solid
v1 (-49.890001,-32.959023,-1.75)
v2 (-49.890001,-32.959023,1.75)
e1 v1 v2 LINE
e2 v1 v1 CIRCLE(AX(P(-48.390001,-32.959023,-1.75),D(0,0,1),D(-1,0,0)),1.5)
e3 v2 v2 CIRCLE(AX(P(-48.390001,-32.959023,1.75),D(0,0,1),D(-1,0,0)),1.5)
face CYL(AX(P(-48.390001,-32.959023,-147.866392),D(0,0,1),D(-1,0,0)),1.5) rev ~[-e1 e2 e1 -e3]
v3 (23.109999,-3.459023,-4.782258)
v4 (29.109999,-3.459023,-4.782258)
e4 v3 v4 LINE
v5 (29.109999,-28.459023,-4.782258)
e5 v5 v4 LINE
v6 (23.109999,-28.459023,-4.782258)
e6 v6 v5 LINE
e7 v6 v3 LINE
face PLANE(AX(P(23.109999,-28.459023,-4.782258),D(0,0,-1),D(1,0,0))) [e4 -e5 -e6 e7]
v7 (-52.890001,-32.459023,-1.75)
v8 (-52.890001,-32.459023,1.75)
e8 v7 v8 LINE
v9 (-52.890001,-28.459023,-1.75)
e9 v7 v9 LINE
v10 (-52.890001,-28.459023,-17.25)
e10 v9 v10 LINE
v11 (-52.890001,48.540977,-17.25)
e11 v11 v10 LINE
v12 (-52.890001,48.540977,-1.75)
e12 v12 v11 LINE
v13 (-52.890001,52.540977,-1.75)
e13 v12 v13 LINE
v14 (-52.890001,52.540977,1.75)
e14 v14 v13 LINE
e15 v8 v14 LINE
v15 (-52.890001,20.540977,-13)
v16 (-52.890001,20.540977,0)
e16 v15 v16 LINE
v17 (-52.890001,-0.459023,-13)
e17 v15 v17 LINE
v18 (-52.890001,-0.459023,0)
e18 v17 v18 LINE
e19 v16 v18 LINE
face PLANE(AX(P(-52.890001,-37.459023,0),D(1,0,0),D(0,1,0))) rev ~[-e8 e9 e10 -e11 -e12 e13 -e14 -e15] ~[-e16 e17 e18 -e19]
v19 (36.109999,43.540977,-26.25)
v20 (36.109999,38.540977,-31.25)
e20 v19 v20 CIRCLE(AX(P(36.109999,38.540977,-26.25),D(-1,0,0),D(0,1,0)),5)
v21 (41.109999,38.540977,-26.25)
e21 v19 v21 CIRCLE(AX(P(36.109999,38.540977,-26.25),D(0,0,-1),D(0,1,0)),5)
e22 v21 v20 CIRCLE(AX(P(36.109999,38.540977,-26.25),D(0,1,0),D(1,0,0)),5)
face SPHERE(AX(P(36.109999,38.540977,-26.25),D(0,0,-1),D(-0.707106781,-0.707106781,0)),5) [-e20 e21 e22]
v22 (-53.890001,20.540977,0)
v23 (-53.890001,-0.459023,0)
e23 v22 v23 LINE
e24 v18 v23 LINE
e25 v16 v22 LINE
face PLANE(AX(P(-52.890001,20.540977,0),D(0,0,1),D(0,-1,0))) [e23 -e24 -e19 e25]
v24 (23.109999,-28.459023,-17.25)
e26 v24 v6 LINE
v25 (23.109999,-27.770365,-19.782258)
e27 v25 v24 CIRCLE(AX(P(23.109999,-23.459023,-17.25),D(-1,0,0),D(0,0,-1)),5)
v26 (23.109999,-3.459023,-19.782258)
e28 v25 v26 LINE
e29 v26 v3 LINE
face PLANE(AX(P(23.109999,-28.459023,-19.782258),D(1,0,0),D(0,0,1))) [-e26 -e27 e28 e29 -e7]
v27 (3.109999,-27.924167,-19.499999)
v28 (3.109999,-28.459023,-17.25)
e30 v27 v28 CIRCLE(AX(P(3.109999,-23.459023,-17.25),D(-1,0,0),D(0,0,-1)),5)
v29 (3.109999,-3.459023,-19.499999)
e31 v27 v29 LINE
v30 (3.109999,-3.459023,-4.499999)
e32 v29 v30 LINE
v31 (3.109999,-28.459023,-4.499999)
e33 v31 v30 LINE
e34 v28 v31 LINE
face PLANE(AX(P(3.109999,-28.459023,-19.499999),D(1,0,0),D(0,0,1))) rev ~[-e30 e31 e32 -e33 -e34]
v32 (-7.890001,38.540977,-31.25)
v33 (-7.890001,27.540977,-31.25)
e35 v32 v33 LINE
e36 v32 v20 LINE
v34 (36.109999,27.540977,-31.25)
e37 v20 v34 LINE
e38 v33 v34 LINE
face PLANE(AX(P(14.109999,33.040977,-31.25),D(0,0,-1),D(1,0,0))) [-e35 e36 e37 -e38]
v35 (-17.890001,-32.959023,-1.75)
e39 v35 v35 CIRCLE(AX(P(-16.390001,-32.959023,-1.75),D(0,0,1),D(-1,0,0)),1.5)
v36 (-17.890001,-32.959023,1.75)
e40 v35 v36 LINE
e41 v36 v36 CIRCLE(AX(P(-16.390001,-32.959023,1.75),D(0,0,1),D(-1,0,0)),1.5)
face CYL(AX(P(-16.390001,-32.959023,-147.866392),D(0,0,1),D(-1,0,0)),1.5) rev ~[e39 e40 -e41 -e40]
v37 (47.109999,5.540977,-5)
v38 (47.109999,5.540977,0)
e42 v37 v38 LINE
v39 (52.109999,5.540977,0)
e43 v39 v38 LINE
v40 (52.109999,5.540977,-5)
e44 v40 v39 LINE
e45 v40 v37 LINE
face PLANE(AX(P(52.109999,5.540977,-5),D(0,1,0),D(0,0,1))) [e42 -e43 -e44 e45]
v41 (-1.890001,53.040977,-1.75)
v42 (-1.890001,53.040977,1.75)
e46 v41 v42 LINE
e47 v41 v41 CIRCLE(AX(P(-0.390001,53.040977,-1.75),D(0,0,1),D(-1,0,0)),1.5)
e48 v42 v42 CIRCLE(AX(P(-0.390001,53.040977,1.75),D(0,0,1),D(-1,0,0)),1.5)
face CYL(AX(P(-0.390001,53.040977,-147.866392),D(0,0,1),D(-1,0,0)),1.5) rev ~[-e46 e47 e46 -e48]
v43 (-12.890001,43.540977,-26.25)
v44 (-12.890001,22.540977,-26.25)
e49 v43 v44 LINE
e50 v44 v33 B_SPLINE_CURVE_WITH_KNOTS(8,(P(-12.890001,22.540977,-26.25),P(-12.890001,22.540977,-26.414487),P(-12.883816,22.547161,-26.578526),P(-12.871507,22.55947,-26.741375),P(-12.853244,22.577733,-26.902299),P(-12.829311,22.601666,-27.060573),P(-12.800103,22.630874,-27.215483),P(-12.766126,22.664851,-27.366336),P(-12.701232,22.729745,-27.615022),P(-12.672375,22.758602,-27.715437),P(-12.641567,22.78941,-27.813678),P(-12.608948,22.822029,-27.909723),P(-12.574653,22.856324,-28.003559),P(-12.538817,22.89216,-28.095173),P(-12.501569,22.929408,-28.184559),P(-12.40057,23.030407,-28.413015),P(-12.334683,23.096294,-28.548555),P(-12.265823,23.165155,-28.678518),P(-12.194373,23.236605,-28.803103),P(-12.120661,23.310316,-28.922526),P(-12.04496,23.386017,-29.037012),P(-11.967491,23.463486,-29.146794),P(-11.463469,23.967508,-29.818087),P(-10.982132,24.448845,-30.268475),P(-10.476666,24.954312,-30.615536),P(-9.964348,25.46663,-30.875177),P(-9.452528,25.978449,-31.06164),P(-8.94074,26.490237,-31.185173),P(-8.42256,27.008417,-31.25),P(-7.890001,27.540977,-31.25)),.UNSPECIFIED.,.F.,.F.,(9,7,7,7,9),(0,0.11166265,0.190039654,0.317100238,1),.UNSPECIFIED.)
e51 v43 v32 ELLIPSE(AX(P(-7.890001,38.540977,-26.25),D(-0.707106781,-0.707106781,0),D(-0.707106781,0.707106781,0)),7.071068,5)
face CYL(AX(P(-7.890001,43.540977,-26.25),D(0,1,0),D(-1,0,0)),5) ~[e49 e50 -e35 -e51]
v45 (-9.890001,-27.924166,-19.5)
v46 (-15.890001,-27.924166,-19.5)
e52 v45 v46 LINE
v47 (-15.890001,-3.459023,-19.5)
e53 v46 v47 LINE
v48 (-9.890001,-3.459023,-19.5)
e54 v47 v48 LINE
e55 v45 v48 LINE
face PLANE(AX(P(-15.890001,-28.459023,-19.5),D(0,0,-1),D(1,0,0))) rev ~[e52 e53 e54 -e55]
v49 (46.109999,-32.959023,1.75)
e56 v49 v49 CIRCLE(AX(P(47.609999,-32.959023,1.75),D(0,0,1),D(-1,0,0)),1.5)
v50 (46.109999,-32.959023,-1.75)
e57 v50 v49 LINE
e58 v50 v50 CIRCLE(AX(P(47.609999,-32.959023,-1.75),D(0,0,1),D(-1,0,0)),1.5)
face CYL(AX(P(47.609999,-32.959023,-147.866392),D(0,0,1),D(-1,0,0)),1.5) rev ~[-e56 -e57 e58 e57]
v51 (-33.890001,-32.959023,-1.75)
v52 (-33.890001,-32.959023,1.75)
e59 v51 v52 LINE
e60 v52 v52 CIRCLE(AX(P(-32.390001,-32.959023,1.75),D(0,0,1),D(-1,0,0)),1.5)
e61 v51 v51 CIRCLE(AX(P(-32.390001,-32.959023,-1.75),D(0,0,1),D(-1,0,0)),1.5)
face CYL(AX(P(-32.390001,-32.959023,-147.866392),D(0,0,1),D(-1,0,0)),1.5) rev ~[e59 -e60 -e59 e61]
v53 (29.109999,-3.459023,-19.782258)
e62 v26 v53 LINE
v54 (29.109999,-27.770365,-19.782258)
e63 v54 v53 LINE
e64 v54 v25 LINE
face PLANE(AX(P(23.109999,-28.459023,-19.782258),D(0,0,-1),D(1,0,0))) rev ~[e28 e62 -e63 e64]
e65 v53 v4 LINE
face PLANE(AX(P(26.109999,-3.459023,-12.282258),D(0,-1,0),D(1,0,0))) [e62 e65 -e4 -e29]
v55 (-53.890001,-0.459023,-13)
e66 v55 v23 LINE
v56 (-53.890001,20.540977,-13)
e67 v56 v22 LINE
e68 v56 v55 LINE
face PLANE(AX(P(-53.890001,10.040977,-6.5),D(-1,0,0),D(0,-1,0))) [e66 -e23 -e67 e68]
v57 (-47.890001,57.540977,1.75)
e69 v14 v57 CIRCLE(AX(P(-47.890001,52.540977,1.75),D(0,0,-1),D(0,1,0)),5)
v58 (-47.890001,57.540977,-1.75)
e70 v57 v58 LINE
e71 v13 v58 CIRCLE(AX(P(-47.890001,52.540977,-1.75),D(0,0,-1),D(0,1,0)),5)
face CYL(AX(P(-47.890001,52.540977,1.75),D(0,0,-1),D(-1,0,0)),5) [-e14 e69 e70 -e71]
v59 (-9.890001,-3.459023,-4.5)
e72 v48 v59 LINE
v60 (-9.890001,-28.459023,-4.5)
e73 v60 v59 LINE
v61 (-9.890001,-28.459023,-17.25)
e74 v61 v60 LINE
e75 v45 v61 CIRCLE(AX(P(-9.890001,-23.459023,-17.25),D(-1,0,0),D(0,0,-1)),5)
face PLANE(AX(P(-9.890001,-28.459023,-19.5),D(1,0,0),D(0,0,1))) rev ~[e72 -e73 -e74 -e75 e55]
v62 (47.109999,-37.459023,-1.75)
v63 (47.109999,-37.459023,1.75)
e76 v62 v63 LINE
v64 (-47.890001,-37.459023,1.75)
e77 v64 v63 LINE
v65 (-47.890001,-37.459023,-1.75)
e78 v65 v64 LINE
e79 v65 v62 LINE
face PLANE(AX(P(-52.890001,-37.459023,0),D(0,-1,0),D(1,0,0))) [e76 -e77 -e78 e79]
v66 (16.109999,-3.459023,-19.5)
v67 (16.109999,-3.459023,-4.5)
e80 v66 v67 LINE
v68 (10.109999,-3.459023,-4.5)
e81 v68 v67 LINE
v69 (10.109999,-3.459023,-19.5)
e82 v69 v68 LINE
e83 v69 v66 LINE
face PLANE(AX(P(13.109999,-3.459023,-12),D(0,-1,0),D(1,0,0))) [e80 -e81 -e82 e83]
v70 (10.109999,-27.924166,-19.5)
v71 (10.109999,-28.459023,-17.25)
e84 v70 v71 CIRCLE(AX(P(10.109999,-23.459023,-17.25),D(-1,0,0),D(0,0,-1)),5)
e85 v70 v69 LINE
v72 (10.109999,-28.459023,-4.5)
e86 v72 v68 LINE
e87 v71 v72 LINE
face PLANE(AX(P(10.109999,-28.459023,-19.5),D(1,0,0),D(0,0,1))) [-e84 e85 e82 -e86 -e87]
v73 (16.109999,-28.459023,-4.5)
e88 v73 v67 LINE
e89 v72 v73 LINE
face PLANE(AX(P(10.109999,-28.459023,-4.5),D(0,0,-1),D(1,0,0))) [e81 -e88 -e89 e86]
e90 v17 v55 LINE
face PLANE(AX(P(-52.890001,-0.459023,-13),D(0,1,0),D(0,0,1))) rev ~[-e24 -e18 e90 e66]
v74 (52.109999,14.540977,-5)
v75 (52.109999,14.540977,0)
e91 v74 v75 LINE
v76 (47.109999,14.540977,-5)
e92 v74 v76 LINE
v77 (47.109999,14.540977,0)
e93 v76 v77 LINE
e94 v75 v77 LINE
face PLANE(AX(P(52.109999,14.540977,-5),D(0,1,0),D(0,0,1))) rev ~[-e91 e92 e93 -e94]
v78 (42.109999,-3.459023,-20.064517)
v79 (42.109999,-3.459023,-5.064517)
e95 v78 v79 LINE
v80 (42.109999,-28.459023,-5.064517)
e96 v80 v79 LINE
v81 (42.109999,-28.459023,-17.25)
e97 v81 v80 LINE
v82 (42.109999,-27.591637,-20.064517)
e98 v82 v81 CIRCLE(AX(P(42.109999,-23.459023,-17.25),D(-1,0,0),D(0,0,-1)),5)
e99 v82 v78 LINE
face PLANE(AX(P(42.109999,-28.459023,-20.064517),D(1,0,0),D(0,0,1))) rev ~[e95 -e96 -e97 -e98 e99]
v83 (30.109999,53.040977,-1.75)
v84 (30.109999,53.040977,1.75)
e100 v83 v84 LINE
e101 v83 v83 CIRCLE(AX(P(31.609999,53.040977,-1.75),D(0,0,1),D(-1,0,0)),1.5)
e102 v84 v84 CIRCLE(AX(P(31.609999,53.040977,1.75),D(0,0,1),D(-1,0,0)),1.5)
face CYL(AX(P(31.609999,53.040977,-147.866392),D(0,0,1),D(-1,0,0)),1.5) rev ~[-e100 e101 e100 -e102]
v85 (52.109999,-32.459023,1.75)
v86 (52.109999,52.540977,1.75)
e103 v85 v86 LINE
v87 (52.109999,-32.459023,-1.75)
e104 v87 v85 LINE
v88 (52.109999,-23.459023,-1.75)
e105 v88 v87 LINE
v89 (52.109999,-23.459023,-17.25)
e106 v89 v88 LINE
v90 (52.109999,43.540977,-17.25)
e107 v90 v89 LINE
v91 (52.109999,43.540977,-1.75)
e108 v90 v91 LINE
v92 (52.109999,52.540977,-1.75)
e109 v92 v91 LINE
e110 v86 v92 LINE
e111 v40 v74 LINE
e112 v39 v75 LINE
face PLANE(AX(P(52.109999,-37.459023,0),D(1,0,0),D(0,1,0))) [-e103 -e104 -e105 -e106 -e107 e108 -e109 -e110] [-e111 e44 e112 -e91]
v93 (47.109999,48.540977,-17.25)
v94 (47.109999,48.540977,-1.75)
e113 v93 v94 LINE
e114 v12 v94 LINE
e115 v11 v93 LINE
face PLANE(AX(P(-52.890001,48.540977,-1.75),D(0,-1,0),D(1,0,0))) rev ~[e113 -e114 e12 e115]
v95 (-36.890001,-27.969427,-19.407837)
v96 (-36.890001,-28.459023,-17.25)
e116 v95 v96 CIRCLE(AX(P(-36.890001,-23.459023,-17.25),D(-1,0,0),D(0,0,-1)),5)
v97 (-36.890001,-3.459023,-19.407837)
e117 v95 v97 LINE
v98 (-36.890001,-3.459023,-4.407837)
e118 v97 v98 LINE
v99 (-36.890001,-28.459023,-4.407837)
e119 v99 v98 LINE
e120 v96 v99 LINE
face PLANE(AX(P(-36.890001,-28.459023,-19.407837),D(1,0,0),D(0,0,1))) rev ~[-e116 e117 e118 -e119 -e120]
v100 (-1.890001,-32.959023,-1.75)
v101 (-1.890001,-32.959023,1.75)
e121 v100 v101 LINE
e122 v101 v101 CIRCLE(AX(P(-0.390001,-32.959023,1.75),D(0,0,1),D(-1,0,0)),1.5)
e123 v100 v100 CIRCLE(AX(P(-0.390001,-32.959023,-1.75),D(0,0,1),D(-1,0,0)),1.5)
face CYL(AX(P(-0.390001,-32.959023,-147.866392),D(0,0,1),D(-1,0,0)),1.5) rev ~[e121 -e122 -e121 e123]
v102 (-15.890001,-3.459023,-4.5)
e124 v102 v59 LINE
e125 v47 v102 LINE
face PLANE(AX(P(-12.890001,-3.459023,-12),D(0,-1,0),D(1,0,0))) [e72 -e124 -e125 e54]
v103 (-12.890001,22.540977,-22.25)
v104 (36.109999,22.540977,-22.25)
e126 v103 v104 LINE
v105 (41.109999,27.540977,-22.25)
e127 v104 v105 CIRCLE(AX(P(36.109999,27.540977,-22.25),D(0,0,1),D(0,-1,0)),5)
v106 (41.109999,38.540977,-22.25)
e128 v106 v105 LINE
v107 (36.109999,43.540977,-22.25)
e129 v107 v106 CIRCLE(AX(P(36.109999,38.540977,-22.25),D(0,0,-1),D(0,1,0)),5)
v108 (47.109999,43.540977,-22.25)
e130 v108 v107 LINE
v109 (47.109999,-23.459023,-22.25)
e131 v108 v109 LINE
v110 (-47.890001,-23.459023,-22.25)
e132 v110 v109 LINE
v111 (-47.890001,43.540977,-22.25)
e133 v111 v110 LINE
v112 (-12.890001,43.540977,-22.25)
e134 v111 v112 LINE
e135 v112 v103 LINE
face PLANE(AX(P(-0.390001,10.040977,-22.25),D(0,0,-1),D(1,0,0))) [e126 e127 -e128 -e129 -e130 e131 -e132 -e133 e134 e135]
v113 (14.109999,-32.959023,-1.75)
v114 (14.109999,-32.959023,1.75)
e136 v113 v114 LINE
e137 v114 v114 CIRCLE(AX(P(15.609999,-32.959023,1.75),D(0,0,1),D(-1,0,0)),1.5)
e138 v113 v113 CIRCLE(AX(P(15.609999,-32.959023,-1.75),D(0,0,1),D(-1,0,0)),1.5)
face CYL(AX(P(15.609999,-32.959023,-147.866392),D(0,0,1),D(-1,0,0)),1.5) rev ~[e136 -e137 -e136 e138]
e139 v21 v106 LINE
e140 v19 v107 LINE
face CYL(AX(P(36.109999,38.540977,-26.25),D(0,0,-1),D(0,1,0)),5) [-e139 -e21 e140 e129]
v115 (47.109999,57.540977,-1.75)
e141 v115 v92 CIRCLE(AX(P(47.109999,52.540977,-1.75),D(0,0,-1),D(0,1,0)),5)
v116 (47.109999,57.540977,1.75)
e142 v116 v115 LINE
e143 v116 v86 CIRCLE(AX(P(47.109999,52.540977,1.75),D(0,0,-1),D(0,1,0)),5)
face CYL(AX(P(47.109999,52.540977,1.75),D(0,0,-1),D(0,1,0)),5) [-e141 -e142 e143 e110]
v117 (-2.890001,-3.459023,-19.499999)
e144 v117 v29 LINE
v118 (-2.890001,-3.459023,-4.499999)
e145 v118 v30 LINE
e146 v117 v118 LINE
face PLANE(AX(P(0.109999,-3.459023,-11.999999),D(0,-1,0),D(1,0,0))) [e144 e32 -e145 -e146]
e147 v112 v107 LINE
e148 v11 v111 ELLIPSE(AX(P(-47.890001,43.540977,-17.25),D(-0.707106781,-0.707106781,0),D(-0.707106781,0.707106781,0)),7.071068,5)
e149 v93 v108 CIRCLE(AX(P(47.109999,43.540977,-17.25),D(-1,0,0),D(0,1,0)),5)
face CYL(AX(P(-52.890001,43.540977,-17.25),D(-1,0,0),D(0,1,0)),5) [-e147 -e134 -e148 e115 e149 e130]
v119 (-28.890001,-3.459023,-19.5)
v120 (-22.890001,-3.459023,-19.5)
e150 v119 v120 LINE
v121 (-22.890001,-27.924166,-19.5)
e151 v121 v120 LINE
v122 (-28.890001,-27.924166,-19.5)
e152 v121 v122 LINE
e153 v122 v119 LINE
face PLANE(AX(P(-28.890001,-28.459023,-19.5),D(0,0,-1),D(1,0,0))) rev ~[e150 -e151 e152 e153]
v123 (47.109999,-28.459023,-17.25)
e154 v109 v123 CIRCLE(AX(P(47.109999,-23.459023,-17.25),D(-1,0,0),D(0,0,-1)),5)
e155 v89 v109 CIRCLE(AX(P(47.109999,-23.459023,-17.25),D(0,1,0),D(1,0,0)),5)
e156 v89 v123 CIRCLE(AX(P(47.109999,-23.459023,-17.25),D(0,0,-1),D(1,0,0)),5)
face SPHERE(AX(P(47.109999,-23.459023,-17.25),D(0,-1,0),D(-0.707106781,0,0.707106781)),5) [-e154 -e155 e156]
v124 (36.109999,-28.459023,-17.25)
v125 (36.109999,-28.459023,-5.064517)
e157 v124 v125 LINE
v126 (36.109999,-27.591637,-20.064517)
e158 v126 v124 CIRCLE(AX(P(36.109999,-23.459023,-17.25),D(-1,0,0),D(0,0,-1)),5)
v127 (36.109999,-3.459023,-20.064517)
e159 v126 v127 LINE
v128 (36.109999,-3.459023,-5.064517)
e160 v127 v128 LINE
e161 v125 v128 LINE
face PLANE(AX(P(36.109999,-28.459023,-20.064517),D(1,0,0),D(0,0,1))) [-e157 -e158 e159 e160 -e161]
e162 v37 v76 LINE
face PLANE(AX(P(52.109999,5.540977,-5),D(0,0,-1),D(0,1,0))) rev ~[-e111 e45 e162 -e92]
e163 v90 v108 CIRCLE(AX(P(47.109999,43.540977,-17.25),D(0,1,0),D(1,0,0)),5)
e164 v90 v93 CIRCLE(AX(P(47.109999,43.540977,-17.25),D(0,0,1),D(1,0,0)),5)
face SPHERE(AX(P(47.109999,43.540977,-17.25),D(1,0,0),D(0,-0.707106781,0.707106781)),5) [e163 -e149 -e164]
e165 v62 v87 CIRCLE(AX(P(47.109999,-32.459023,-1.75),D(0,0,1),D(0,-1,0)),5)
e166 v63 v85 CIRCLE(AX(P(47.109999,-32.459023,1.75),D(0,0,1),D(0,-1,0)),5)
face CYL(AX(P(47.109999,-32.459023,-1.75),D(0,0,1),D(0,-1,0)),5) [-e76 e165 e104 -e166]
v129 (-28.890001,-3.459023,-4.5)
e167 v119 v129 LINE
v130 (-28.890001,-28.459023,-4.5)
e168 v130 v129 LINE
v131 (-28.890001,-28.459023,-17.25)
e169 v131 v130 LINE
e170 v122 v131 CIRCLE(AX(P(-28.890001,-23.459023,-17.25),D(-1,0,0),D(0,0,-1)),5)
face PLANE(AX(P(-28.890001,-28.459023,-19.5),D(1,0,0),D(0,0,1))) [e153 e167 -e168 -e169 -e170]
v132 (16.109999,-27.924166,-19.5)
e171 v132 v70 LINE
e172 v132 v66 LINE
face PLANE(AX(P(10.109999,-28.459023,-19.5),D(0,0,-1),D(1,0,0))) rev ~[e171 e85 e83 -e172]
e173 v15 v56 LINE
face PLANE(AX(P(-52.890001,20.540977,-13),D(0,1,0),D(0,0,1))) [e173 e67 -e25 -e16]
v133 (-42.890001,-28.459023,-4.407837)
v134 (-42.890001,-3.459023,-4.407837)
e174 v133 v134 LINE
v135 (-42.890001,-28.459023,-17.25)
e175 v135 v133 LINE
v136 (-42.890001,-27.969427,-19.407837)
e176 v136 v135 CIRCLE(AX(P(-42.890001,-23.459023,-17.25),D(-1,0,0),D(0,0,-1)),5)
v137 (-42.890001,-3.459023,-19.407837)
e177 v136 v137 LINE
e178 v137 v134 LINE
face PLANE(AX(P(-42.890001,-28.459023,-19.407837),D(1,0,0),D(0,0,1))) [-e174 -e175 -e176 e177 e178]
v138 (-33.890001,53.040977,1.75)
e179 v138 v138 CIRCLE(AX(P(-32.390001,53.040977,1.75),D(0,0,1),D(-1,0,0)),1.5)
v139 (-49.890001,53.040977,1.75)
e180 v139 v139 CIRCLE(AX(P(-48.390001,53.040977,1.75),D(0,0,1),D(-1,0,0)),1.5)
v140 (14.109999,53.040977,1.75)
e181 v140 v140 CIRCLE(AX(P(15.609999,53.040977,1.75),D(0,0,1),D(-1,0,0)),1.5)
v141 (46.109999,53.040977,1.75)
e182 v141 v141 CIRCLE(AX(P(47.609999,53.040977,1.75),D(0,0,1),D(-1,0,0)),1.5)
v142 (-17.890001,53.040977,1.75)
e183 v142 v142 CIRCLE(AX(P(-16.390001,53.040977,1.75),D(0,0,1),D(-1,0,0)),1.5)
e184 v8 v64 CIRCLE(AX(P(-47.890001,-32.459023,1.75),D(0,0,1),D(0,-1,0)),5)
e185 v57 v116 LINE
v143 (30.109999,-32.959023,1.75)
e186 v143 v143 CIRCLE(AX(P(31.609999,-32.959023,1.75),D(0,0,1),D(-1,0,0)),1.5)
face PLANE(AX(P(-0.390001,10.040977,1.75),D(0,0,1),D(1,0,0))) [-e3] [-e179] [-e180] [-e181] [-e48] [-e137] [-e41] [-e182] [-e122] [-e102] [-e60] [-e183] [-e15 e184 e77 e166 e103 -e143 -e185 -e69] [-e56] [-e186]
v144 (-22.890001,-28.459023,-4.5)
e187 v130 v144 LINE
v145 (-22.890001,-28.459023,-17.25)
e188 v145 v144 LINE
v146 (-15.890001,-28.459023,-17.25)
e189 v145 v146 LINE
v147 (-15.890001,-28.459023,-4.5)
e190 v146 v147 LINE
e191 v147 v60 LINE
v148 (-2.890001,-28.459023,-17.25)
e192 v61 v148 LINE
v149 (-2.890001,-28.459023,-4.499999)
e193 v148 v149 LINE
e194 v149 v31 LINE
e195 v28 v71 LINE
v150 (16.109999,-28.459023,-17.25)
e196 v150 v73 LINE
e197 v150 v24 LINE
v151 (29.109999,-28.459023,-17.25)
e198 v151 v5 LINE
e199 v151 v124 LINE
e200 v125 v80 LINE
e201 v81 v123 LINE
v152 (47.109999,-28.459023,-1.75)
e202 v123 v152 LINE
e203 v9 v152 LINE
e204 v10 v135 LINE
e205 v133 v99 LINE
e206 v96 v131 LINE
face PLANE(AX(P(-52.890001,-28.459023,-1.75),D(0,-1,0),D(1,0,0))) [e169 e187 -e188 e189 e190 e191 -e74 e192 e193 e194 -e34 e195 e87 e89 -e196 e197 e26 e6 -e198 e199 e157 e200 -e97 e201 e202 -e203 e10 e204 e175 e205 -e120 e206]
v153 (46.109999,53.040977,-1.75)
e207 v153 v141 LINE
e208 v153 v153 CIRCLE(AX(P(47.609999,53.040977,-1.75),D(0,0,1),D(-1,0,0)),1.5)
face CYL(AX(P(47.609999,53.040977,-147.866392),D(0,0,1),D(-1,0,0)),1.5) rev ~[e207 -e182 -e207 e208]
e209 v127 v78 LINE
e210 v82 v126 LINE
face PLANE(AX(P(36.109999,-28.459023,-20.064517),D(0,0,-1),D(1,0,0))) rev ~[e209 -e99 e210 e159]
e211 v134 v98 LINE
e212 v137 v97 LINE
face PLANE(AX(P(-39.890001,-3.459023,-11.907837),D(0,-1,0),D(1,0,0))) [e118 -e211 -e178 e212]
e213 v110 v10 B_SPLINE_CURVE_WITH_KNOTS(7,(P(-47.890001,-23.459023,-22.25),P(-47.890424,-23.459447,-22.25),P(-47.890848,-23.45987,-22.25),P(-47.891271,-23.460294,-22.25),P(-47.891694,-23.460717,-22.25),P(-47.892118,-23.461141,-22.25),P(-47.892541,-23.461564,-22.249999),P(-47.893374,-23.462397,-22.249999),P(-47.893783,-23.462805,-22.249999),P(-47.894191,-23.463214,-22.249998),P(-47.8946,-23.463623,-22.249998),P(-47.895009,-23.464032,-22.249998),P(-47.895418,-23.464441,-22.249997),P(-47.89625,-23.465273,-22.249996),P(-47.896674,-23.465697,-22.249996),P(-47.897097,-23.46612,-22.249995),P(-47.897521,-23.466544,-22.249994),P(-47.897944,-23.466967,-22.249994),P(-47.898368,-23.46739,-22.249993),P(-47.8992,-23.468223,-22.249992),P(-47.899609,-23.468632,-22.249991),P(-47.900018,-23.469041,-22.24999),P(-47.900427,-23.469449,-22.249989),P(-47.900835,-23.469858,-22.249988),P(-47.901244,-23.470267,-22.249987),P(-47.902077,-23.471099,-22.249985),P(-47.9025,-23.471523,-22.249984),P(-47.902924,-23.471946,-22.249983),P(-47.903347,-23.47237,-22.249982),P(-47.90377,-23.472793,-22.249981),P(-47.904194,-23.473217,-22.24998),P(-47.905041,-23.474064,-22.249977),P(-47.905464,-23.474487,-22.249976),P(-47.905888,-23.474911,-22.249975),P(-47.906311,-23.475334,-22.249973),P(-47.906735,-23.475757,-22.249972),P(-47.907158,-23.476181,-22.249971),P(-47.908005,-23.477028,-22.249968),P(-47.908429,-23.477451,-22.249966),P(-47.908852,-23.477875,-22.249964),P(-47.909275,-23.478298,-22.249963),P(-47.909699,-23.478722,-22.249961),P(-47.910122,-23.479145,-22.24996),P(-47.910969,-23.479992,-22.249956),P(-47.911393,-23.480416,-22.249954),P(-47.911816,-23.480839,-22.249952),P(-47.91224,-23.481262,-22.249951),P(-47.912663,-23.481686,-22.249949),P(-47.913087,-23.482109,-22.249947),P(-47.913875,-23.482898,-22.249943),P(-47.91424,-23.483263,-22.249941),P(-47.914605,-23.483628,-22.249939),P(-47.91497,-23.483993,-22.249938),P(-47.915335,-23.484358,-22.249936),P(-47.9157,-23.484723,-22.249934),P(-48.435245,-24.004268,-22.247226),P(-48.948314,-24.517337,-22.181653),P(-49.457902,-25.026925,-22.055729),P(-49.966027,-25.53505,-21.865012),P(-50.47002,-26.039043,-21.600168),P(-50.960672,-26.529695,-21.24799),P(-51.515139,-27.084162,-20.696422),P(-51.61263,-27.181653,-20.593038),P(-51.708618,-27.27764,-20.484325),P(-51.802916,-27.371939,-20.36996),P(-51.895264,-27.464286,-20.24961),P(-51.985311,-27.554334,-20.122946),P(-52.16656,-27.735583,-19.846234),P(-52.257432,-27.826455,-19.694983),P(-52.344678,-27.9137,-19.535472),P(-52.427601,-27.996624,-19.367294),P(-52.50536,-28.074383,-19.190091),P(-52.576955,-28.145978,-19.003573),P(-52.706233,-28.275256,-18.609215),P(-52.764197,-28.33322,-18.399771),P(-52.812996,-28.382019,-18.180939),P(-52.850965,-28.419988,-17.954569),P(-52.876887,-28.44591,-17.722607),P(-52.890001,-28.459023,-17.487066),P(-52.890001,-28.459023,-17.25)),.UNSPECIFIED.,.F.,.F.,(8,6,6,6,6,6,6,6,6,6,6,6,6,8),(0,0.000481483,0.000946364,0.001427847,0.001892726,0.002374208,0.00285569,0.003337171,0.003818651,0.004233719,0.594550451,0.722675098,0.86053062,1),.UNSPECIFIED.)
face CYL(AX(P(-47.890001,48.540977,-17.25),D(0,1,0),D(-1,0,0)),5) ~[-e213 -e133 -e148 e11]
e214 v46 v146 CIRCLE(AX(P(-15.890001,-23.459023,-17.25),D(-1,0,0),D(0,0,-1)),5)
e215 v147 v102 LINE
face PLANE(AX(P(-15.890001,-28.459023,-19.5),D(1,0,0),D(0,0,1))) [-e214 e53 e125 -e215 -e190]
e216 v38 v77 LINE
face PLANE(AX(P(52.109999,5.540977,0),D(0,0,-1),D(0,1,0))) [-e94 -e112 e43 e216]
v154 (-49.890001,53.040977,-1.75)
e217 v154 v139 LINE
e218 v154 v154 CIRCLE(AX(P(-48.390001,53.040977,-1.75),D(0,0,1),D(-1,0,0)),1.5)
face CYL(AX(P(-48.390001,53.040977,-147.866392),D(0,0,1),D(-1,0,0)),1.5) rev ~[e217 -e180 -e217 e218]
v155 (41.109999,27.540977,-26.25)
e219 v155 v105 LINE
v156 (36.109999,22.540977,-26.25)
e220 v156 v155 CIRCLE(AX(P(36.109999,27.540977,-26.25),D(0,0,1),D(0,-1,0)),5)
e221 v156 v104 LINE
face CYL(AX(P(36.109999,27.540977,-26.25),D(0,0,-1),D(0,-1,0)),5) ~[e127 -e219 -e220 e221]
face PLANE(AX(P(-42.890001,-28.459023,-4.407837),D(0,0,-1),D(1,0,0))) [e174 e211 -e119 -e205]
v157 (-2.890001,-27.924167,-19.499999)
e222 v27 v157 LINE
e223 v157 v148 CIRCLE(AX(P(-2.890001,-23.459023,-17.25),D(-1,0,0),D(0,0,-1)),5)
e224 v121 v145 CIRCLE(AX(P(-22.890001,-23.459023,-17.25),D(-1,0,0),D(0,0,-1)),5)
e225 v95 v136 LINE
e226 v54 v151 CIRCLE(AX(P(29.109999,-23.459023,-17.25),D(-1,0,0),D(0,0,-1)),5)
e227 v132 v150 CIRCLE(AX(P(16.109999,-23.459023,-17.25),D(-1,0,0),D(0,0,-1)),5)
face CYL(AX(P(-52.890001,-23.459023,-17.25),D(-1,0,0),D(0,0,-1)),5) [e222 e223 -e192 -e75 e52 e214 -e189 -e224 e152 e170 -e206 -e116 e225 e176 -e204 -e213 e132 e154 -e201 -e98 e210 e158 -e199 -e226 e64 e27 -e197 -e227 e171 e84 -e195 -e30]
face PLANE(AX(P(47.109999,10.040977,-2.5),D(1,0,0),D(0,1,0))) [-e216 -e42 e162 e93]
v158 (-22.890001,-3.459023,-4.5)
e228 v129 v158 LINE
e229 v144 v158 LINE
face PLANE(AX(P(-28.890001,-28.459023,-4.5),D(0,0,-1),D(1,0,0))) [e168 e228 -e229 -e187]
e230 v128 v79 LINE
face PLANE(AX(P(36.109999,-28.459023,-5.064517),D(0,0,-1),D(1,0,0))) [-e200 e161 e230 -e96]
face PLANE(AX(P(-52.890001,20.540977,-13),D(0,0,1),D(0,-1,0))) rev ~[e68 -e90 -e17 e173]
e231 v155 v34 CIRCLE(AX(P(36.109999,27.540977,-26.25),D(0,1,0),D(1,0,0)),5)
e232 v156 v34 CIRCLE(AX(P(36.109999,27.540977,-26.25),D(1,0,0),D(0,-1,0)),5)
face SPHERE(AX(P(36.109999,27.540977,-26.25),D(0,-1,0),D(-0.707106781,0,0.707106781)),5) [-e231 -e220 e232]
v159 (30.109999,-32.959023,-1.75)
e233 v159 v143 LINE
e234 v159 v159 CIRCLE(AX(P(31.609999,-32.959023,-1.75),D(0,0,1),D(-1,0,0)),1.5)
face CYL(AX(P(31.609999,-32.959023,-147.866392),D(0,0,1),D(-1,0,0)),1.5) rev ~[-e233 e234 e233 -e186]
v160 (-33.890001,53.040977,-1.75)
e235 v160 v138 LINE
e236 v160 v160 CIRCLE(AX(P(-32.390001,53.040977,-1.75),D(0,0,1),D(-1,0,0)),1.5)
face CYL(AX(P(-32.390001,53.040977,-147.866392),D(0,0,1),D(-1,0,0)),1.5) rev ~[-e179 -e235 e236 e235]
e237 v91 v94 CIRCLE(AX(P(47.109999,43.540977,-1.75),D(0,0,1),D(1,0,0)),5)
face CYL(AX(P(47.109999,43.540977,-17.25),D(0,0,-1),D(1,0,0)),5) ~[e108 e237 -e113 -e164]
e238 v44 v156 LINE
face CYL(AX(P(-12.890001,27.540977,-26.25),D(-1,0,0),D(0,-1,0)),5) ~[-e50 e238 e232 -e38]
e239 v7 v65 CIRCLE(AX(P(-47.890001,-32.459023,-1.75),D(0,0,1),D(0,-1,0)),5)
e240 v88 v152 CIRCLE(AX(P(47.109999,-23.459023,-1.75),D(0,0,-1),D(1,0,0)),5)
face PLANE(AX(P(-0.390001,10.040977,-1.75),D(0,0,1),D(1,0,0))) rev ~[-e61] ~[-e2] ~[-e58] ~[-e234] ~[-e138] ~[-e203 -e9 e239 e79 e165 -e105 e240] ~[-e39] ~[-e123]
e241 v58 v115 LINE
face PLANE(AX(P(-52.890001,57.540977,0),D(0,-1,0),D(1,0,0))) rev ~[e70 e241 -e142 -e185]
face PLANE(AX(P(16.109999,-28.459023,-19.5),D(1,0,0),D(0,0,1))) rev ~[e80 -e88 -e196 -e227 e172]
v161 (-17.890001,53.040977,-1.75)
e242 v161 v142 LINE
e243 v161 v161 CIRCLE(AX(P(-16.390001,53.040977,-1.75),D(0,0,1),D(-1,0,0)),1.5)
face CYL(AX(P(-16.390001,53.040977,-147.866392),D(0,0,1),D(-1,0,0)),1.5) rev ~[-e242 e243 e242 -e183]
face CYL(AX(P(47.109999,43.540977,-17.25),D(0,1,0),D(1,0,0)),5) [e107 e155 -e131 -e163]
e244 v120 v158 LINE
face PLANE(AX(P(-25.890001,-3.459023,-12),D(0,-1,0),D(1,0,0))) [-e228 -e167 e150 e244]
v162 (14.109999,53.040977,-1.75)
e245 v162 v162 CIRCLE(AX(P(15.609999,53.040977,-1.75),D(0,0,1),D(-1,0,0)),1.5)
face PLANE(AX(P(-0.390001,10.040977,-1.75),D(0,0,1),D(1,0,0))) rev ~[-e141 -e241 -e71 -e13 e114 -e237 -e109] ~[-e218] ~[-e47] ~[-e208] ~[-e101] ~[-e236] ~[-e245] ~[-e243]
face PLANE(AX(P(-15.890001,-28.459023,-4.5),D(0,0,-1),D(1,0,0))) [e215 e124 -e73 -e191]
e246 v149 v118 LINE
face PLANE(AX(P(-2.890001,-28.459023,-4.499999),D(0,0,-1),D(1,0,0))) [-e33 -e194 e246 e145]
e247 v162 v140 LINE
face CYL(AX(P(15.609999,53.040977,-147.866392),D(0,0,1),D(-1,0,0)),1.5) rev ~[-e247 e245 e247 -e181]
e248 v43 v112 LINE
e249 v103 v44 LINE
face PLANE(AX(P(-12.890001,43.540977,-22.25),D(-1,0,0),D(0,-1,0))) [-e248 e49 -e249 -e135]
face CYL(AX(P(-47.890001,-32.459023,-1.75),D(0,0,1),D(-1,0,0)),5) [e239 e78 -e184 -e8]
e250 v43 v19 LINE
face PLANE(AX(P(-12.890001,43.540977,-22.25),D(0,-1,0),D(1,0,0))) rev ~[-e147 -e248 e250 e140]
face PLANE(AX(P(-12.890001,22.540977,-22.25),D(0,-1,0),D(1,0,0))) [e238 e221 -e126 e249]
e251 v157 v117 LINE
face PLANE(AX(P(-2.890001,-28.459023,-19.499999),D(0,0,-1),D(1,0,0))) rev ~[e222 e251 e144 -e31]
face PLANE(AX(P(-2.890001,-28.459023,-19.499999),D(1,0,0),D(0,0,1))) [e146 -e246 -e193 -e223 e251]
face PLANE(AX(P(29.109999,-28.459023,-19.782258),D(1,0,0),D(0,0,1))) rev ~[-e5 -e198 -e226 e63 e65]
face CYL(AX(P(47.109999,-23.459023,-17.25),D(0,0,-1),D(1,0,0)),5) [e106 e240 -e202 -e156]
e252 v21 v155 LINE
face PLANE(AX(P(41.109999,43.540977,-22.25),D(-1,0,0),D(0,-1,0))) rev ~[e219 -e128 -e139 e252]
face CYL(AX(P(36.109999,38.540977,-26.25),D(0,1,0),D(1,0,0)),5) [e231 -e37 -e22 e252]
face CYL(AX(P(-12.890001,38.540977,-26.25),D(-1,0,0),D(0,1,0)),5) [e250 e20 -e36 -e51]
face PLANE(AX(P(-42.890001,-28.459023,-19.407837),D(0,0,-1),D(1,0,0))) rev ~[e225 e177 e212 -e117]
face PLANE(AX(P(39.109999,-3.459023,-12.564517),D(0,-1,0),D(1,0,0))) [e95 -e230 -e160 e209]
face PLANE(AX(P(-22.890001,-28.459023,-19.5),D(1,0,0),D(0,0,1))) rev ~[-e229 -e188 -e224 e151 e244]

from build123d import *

# Parameters (mm, degrees)
F0_W          = 105
F0_H          = 95
F1_DEPTH      = 1.75
F2_W          = 105
F2_H          = 77
F3_DEPTH      = 20.5
F4_W          = 54
F4_H          = 21
F5_DEPTH      = 9
F6_W          = 9
F6_H          = 5
F7_DEPTH      = 5
F8_W          = 21
F8_H          = 13
F9_DEPTH      = 1
F11_D         = 3
F13_D         = 3
F14_W         = 6
F14_H         = 15
F15_DEPTH     = 25
F16_T1_DEPTH  = 67
F16_T3_DEPTH  = 100
F16_T5_DEPTH  = 15.5
F16_T7_DEPTH  = 49
F16_T9_DEPTH  = 11
F16_T11_DEPTH = 21
F16_T13_DEPTH = 4
F16_T15_DEPTH = 77
F16_S19_W     = 5.1
F16_S19_H     = 5.1
F16_T20_DEPTH = 5.1
F16_S25_W     = 5.1
F16_S25_H     = 5.1
F16_T26_DEPTH = 5.1
F16_S31_W     = 5.1
F16_S31_H     = 5.1
F16_T32_DEPTH = 5.1
F16_S37_W     = 5.1
F16_S37_H     = 5.1
F16_T38_DEPTH = 5.1
F16_T45_DEPTH = 89.5
F16_T49_DEPTH = 112.5
F16_T56_DEPTH = 61.5
F16_T60_DEPTH = 33.5
F16_T67_DEPTH = 33.5
F16_T71_DEPTH = 61.5
F16_T78_DEPTH = 89.5
F16_T82_DEPTH = 112.5
F17_R         = 5


# Not quite as in the source:
# - a fillet or chamfer that OpenCascade refuses, or shapes differently, is made with other operations: its cross-section is extruded or revolved along the edge and cut away or added
# - two fillets or chamfers of one size are made in one step


with BuildPart() as f1:
    # F0 (on Top) → F1 (new body, symmetric)
    with BuildSketch(Plane.XY):
        with Locations((-0.3900006413, 10.040976562)):
            Rectangle(F0_W, F0_H)
    extrude(amount=F1_DEPTH, both=True)

    # F2 (on face) → F3 (join)
    with BuildSketch(Plane(origin=(0, 0, -1.75), x_dir=(1, 0, 0), z_dir=(0, 0, -1))):
        with Locations((-0.3900006413, -10.040976562)):
            Rectangle(F2_W, F2_H)
    extrude(amount=F3_DEPTH)

    # F4 (on face) → F5 (join)
    with BuildSketch(Plane(origin=(0, 0, -22.25), x_dir=(1, 0, 0), z_dir=(0, 0, -1))):
        with Locations((14.1099993587, -33.040976562)):
            Rectangle(F4_W, F4_H)
    extrude(amount=F5_DEPTH)

    # F6 (on face) → F7 (cut)
    with BuildSketch(Plane.YZ.offset(52.1099993587)):
        with Locations((10.040976562, -2.5)):
            Rectangle(F6_W, F6_H)
    extrude(amount=-F7_DEPTH, mode=Mode.SUBTRACT)

    # F8 (on face) → F9 (join)
    with BuildSketch(Plane(origin=(-52.8900006413, 0, 0), x_dir=(0, -1, 0), z_dir=(-1, 0, 0))):
        with Locations((-10.040976562, -6.5)):
            Rectangle(F8_W, F8_H)
    extrude(amount=F9_DEPTH)

    # F11 (through all)
    with Locations(Plane(origin=(0, 0, -1.75), x_dir=(1, 0, 0), z_dir=(0, 0, -1))):
        with Locations((47.6099993587, 32.959023438), (31.6099993587, 32.959023438), (15.6099993587, 32.959023438), (-0.3900006413, 32.959023438), (-16.3900006413, 32.959023438), (-32.3900006413, 32.959023438), (-48.3900006413, 32.959023438)):
            Hole(F11_D / 2)

    # F13 (through all)
    with Locations(Plane(origin=(0, 0, -1.75), x_dir=(1, 0, 0), z_dir=(0, 0, -1))):
        with Locations((47.6099993587, -53.040976562), (31.6099993587, -53.040976562), (15.6099993587, -53.040976562), (-0.3900006413, -53.040976562), (-16.3900006413, -53.040976562), (-32.3900006413, -53.040976562), (-48.3900006413, -53.040976562)):
            Hole(F13_D / 2)

    # F14 (on face) → F15 (cut)
    with BuildSketch(Plane.XZ.offset(28.459023438)):
        with Locations((-39.8900006413, -11.9078365183)):
            Rectangle(F14_W, F14_H)
        with Locations((-25.8900006413, -12.0000001043)):
            Rectangle(F14_W, F14_H)
        with Locations((-12.8900006413, -11.9999996386)):
            Rectangle(F14_W, F14_H)
        with Locations((0.1099993587, -11.999999173)):
            Rectangle(F14_W, F14_H)
        with Locations((13.1099993587, -11.9999996386)):
            Rectangle(F14_W, F14_H)
        with Locations((26.1099993587, -12.2822578996)):
            Rectangle(F14_W, F14_H)
        with Locations((39.1099993587, -12.5645168446)):
            Rectangle(F14_W, F14_H)
    extrude(amount=-F15_DEPTH, mode=Mode.SUBTRACT)

    # F16: fillet of radius 5 on 12 edges, made by hand

    # F16_s2 → F16_t1 (cut)
    with BuildSketch(Plane.XZ.offset(-43.540976562)):
        with BuildLine():
            ThreePointArc((52.1099993587, -17.25), (50.6455332646, -20.7855339059), (47.1099993587, -22.25))
            Line((47.1099993587, -22.25), (47.1099993587, -22.35))
            Line((47.1099993587, -22.35), (52.2099993587, -22.35))
            Line((52.2099993587, -22.35), (52.2099993587, -17.25))
            Line((52.2099993587, -17.25), (52.1099993587, -17.25))
        make_face()
    extrude(amount=F16_T1_DEPTH, mode=Mode.SUBTRACT)

    # F16_s4 → F16_t3 (cut)
    with BuildSketch(Plane.YZ.offset(-52.8900006413)):
        with BuildLine():
            ThreePointArc((-23.459023438, -22.25), (-26.9945573439, -20.7855339059), (-28.459023438, -17.25))
            Line((-28.459023438, -17.25), (-28.559023438, -17.25))
            Line((-28.559023438, -17.25), (-28.559023438, -22.35))
            Line((-28.559023438, -22.35), (-23.459023438, -22.35))
            Line((-23.459023438, -22.35), (-23.459023438, -22.25))
        make_face()
        with BuildLine():
            ThreePointArc((48.540976562, -17.25), (47.076510468, -20.7855339059), (43.540976562, -22.25))
            Line((43.540976562, -22.25), (43.540976562, -22.35))
            Line((43.540976562, -22.35), (48.640976562, -22.35))
            Line((48.640976562, -22.35), (48.640976562, -17.25))
            Line((48.640976562, -17.25), (48.540976562, -17.25))
        make_face()
    extrude(amount=F16_T3_DEPTH, mode=Mode.SUBTRACT)

    # F16_s6 → F16_t5 (cut)
    with BuildSketch(Plane.XY.offset(-17.25)):
        with BuildLine():
            ThreePointArc((52.1099993587, -23.459023438), (50.6455332646, -26.9945573439), (47.1099993587, -28.459023438))
            Line((47.1099993587, -28.459023438), (47.1099993587, -28.559023438))
            Line((47.1099993587, -28.559023438), (52.2099993587, -28.559023438))
            Line((52.2099993587, -28.559023438), (52.2099993587, -23.459023438))
            Line((52.2099993587, -23.459023438), (52.1099993587, -23.459023438))
        make_face()
        with BuildLine():
            ThreePointArc((52.1099993587, 43.540976562), (50.6455332646, 47.076510468), (47.1099993587, 48.540976562))
            Line((47.1099993587, 48.540976562), (47.1099993587, 48.640976562))
            Line((47.1099993587, 48.640976562), (52.2099993587, 48.640976562))
            Line((52.2099993587, 48.640976562), (52.2099993587, 43.540976562))
            Line((52.2099993587, 43.540976562), (52.1099993587, 43.540976562))
        make_face()
    extrude(amount=F16_T5_DEPTH, mode=Mode.SUBTRACT)

    # F16_s8 → F16_t7 (cut)
    with BuildSketch(Plane.YZ.offset(-12.8900006413)):
        with BuildLine():
            ThreePointArc((22.540976562, -26.25), (24.0054426561, -29.7855339059), (27.540976562, -31.25))
            Line((27.540976562, -31.25), (27.540976562, -31.35))
            Line((27.540976562, -31.35), (22.440976562, -31.35))
            Line((22.440976562, -31.35), (22.440976562, -26.25))
            Line((22.440976562, -26.25), (22.540976562, -26.25))
        make_face()
        with BuildLine():
            ThreePointArc((43.540976562, -26.25), (42.076510468, -29.7855339059), (38.540976562, -31.25))
            Line((38.540976562, -31.25), (38.540976562, -31.35))
            Line((38.540976562, -31.35), (43.640976562, -31.35))
            Line((43.640976562, -31.35), (43.640976562, -26.25))
            Line((43.640976562, -26.25), (43.540976562, -26.25))
        make_face()
    extrude(amount=F16_T7_DEPTH, mode=Mode.SUBTRACT)

    # F16_s10 → F16_t9 (cut)
    with BuildSketch(Plane.XZ.offset(-38.540976562)):
        with BuildLine():
            ThreePointArc((41.1099993587, -26.25), (39.6455332646, -29.7855339059), (36.1099993587, -31.25))
            Line((36.1099993587, -31.25), (36.1099993587, -31.35))
            Line((36.1099993587, -31.35), (41.2099993587, -31.35))
            Line((41.2099993587, -31.35), (41.2099993587, -26.25))
            Line((41.2099993587, -26.25), (41.1099993587, -26.25))
        make_face()
    extrude(amount=F16_T9_DEPTH, mode=Mode.SUBTRACT)

    # F16_s12 → F16_t11 (cut)
    with BuildSketch(Plane.XZ.offset(-43.540976562)):
        with BuildLine():
            ThreePointArc((-12.8900006413, -26.25), (-11.4255345473, -29.7855339059), (-7.8900006413, -31.25))
            Line((-7.8900006413, -31.25), (-7.8900006413, -31.35))
            Line((-7.8900006413, -31.35), (-12.9900006413, -31.35))
            Line((-12.9900006413, -31.35), (-12.9900006413, -26.25))
            Line((-12.9900006413, -26.25), (-12.8900006413, -26.25))
        make_face()
    extrude(amount=F16_T11_DEPTH, mode=Mode.SUBTRACT)

    # F16_s14 → F16_t13 (cut)
    with BuildSketch(Plane.XY.offset(-26.25)):
        with BuildLine():
            ThreePointArc((36.1099993587, 22.540976562), (39.6455332646, 24.0054426561), (41.1099993587, 27.540976562))
            Line((41.1099993587, 27.540976562), (41.2099993587, 27.540976562))
            Line((41.2099993587, 27.540976562), (41.2099993587, 22.440976562))
            Line((41.2099993587, 22.440976562), (36.1099993587, 22.440976562))
            Line((36.1099993587, 22.440976562), (36.1099993587, 22.540976562))
        make_face()
        with BuildLine():
            ThreePointArc((36.1099993587, 43.540976562), (39.6455332646, 42.076510468), (41.1099993587, 38.540976562))
            Line((41.1099993587, 38.540976562), (41.2099993587, 38.540976562))
            Line((41.2099993587, 38.540976562), (41.2099993587, 43.640976562))
            Line((41.2099993587, 43.640976562), (36.1099993587, 43.640976562))
            Line((36.1099993587, 43.640976562), (36.1099993587, 43.540976562))
        make_face()
    extrude(amount=F16_T13_DEPTH, mode=Mode.SUBTRACT)

    # F16_s16 → F16_t15 (cut)
    with BuildSketch(Plane.XZ.offset(-48.540976562)):
        with BuildLine():
            ThreePointArc((-52.8900006413, -17.25), (-51.4255345473, -20.7855339059), (-47.8900006413, -22.25))
            Line((-47.8900006413, -22.25), (-47.8900006413, -22.35))
            Line((-47.8900006413, -22.35), (-52.9900006413, -22.35))
            Line((-52.9900006413, -22.35), (-52.9900006413, -17.25))
            Line((-52.9900006413, -17.25), (-52.8900006413, -17.25))
        make_face()
    extrude(amount=F16_T15_DEPTH, mode=Mode.SUBTRACT)


with BuildPart() as f16_tool18:
    # F16_s19 → F16_t20 (new body)
    with BuildSketch(Plane.YZ.offset(47.1099993587)):
        with Locations((46.090976562, -19.8)):
            Rectangle(F16_S19_W, F16_S19_H)
    extrude(amount=F16_T20_DEPTH)

    # F16_s21 → F16_t22 (revolve, cut)
    with BuildSketch(Plane(origin=(47.1099993587, 43.540976562, -17.25), x_dir=(0, -0.7071067812, 0.7071067812), z_dir=(0, 0.7071067812, 0.7071067812))):
        with BuildLine():
            ThreePointArc((0, -5), (5, 0), (0, 5))
            Line((0, 5), (0, -5))
        make_face()
    revolve(axis=Axis((47.1099993587, 43.540976562, -17.25), (1, 0, 0)), mode=Mode.SUBTRACT)


with BuildPart() as f1_1:
    add(f1.part)

    # F16_t17: cut F16_tool18
    add(f16_tool18.part, mode=Mode.SUBTRACT)


with BuildPart() as f16_tool24:
    # F16_s25 → F16_t26 (new body)
    with BuildSketch(Plane.XZ.offset(23.459023438)):
        with Locations((49.6599993587, -19.8)):
            Rectangle(F16_S25_W, F16_S25_H)
    extrude(amount=F16_T26_DEPTH)

    # F16_s27 → F16_t28 (revolve, cut)
    with BuildSketch(Plane(origin=(47.1099993587, -23.459023438, -17.25), x_dir=(-0.7071067812, 0, 0.7071067812), z_dir=(0.7071067812, 0, 0.7071067812))):
        with BuildLine():
            ThreePointArc((0, -5), (5, 0), (0, 5))
            Line((0, 5), (0, -5))
        make_face()
    revolve(axis=Axis((47.1099993587, -23.459023438, -17.25), (0, -1, 0)), mode=Mode.SUBTRACT)


with BuildPart() as f1_2:
    add(f1_1.part)

    # F16_t23: cut F16_tool24
    add(f16_tool24.part, mode=Mode.SUBTRACT)


with BuildPart() as f16_tool30:
    # F16_s31 → F16_t32 (new body)
    with BuildSketch(Plane.XZ.offset(-27.540976562)):
        with Locations((38.6599993587, -28.8)):
            Rectangle(F16_S31_W, F16_S31_H)
    extrude(amount=F16_T32_DEPTH)

    # F16_s33 → F16_t34 (revolve, cut)
    with BuildSketch(Plane(origin=(36.1099993587, 27.540976562, -26.25), x_dir=(-0.7071067812, 0, 0.7071067812), z_dir=(0.7071067812, 0, 0.7071067812))):
        with BuildLine():
            ThreePointArc((0, -5), (5, 0), (0, 5))
            Line((0, 5), (0, -5))
        make_face()
    revolve(axis=Axis((36.1099993587, 27.540976562, -26.25), (0, -1, 0)), mode=Mode.SUBTRACT)


with BuildPart() as f1_3:
    add(f1_2.part)

    # F16_t29: cut F16_tool30
    add(f16_tool30.part, mode=Mode.SUBTRACT)


with BuildPart() as f16_tool36:
    # F16_s37 → F16_t38 (new body)
    with BuildSketch(Plane.XY.offset(-26.25)):
        with Locations((38.6599993587, 41.090976562)):
            Rectangle(F16_S37_W, F16_S37_H)
    extrude(amount=-F16_T38_DEPTH)

    # F16_s39 → F16_t40 (revolve, cut)
    with BuildSketch(Plane(origin=(36.1099993587, 38.540976562, -26.25), x_dir=(-0.7071067812, -0.7071067812, 0), z_dir=(0.7071067812, -0.7071067812, 0))):
        with BuildLine():
            ThreePointArc((0, -5), (5, 0), (0, 5))
            Line((0, 5), (0, -5))
        make_face()
    revolve(axis=Axis((36.1099993587, 38.540976562, -26.25), (0, 0, -1)), mode=Mode.SUBTRACT)


with BuildPart() as f1_4:
    add(f1_3.part)

    # F16_t35: cut F16_tool36
    add(f16_tool36.part, mode=Mode.SUBTRACT)


with BuildPart() as f16_tool43:
    # F16_s44 → F16_t45 (new body)
    with BuildSketch(Plane.XZ.offset(40.959023438)):
        with BuildLine():
            ThreePointArc((-52.8900006413, -17.25), (-51.4255345473, -20.7855339059), (-47.8900006413, -22.25))
            Line((-47.8900006413, -22.25), (-47.8900006413, -22.35))
            Line((-47.8900006413, -22.35), (-52.9900006413, -22.35))
            Line((-52.9900006413, -22.35), (-52.9900006413, -17.25))
            Line((-52.9900006413, -17.25), (-52.8900006413, -17.25))
        make_face()
    extrude(amount=-F16_T45_DEPTH)

    split(bisect_by=Plane.XZ.offset(28.459023438), keep=Keep.TOP)


with BuildPart() as f16_tool47:
    # F16_s48 → F16_t49 (new body)
    with BuildSketch(Plane.YZ.offset(47.1099993587)):
        with BuildLine():
            ThreePointArc((-23.459023438, -22.25), (-26.9945573439, -20.7855339059), (-28.459023438, -17.25))
            Line((-28.459023438, -17.25), (-28.559023438, -17.25))
            Line((-28.559023438, -17.25), (-28.559023438, -22.35))
            Line((-28.559023438, -22.35), (-23.459023438, -22.35))
            Line((-23.459023438, -22.35), (-23.459023438, -22.25))
        make_face()
    extrude(amount=-F16_T49_DEPTH)

    split(bisect_by=Plane.YZ.offset(-52.8900006413), keep=Keep.BOTTOM)


with BuildPart() as f16_tool43_1:
    add(f16_tool43.part)

    # F16_t51: intersect F16_tool47
    add(f16_tool47.part, mode=Mode.INTERSECT)


with BuildPart() as f1_5:
    add(f1_4.part)

    # F16_t41: cut F16_tool43
    add(f16_tool43_1.part, mode=Mode.SUBTRACT)


with BuildPart() as f16_tool54:
    # F16_s55 → F16_t56 (new body)
    with BuildSketch(Plane.YZ.offset(36.1099993587)):
        with BuildLine():
            ThreePointArc((22.540976562, -26.25), (24.0054426561, -29.7855339059), (27.540976562, -31.25))
            Line((27.540976562, -31.25), (27.540976562, -31.35))
            Line((27.540976562, -31.35), (22.440976562, -31.35))
            Line((22.440976562, -31.35), (22.440976562, -26.25))
            Line((22.440976562, -26.25), (22.540976562, -26.25))
        make_face()
    extrude(amount=-F16_T56_DEPTH)

    split(bisect_by=Plane.YZ.offset(-12.8900006413), keep=Keep.BOTTOM)


with BuildPart() as f16_tool58:
    # F16_s59 → F16_t60 (new body)
    with BuildSketch(Plane.XZ.offset(-10.040976562)):
        with BuildLine():
            ThreePointArc((-12.8900006413, -26.25), (-11.4255345473, -29.7855339059), (-7.8900006413, -31.25))
            Line((-7.8900006413, -31.25), (-7.8900006413, -31.35))
            Line((-7.8900006413, -31.35), (-12.9900006413, -31.35))
            Line((-12.9900006413, -31.35), (-12.9900006413, -26.25))
            Line((-12.9900006413, -26.25), (-12.8900006413, -26.25))
        make_face()
    extrude(amount=-F16_T60_DEPTH)

    split(bisect_by=Plane.XZ.offset(-22.540976562), keep=Keep.TOP)


with BuildPart() as f16_tool54_1:
    add(f16_tool54.part)

    # F16_t62: intersect F16_tool58
    add(f16_tool58.part, mode=Mode.INTERSECT)


with BuildPart() as f1_6:
    add(f1_5.part)

    # F16_t52: cut F16_tool54
    add(f16_tool54_1.part, mode=Mode.SUBTRACT)


with BuildPart() as f16_tool65:
    # F16_s66 → F16_t67 (new body)
    with BuildSketch(Plane.XZ.offset(-22.540976562)):
        with BuildLine():
            ThreePointArc((-12.8900006413, -26.25), (-11.4255345473, -29.7855339059), (-7.8900006413, -31.25))
            Line((-7.8900006413, -31.25), (-7.8900006413, -31.35))
            Line((-7.8900006413, -31.35), (-12.9900006413, -31.35))
            Line((-12.9900006413, -31.35), (-12.9900006413, -26.25))
            Line((-12.9900006413, -26.25), (-12.8900006413, -26.25))
        make_face()
    extrude(amount=-F16_T67_DEPTH)

    split(bisect_by=Plane.XZ.offset(-43.540976562), keep=Keep.BOTTOM)


with BuildPart() as f16_tool69:
    # F16_s70 → F16_t71 (new body)
    with BuildSketch(Plane.YZ.offset(-25.3900006413)):
        with BuildLine():
            ThreePointArc((43.540976562, -26.25), (42.076510468, -29.7855339059), (38.540976562, -31.25))
            Line((38.540976562, -31.25), (38.540976562, -31.35))
            Line((38.540976562, -31.35), (43.640976562, -31.35))
            Line((43.640976562, -31.35), (43.640976562, -26.25))
            Line((43.640976562, -26.25), (43.540976562, -26.25))
        make_face()
    extrude(amount=F16_T71_DEPTH)

    split(bisect_by=Plane.YZ.offset(-12.8900006413), keep=Keep.BOTTOM)


with BuildPart() as f16_tool65_1:
    add(f16_tool65.part)

    # F16_t73: intersect F16_tool69
    add(f16_tool69.part, mode=Mode.INTERSECT)


with BuildPart() as f1_7:
    add(f1_6.part)

    # F16_t63: cut F16_tool65
    add(f16_tool65_1.part, mode=Mode.SUBTRACT)


with BuildPart() as f16_tool76:
    # F16_s77 → F16_t78 (new body)
    with BuildSketch(Plane.XZ.offset(28.459023438)):
        with BuildLine():
            ThreePointArc((-52.8900006413, -17.25), (-51.4255345473, -20.7855339059), (-47.8900006413, -22.25))
            Line((-47.8900006413, -22.25), (-47.8900006413, -22.35))
            Line((-47.8900006413, -22.35), (-52.9900006413, -22.35))
            Line((-52.9900006413, -22.35), (-52.9900006413, -17.25))
            Line((-52.9900006413, -17.25), (-52.8900006413, -17.25))
        make_face()
    extrude(amount=-F16_T78_DEPTH)

    split(bisect_by=Plane.XZ.offset(-48.540976562), keep=Keep.BOTTOM)


with BuildPart() as f16_tool80:
    # F16_s81 → F16_t82 (new body)
    with BuildSketch(Plane.YZ.offset(-65.3900006413)):
        with BuildLine():
            ThreePointArc((48.540976562, -17.25), (47.076510468, -20.7855339059), (43.540976562, -22.25))
            Line((43.540976562, -22.25), (43.540976562, -22.35))
            Line((43.540976562, -22.35), (48.640976562, -22.35))
            Line((48.640976562, -22.35), (48.640976562, -17.25))
            Line((48.640976562, -17.25), (48.540976562, -17.25))
        make_face()
    extrude(amount=F16_T82_DEPTH)

    split(bisect_by=Plane.YZ.offset(-52.8900006413), keep=Keep.BOTTOM)


with BuildPart() as f16_tool76_1:
    add(f16_tool76.part)

    # F16_t84: intersect F16_tool80
    add(f16_tool80.part, mode=Mode.INTERSECT)


with BuildPart() as f1_8:
    add(f1_7.part)

    # F16_t74: cut F16_tool76
    add(f16_tool76_1.part, mode=Mode.SUBTRACT)

    # F17
    f17_edges = [f1_8.edges().sort_by_distance(p)[0] for p in [
        (-52.890001, 57.540977, 0),
        (52.109999, 57.540977, 0),
        (-52.890001, -37.459023, 0),
        (52.109999, -37.459023, 0),
    ]]
    fillet(f17_edges, radius=F17_R)


solid = f1_8.part
